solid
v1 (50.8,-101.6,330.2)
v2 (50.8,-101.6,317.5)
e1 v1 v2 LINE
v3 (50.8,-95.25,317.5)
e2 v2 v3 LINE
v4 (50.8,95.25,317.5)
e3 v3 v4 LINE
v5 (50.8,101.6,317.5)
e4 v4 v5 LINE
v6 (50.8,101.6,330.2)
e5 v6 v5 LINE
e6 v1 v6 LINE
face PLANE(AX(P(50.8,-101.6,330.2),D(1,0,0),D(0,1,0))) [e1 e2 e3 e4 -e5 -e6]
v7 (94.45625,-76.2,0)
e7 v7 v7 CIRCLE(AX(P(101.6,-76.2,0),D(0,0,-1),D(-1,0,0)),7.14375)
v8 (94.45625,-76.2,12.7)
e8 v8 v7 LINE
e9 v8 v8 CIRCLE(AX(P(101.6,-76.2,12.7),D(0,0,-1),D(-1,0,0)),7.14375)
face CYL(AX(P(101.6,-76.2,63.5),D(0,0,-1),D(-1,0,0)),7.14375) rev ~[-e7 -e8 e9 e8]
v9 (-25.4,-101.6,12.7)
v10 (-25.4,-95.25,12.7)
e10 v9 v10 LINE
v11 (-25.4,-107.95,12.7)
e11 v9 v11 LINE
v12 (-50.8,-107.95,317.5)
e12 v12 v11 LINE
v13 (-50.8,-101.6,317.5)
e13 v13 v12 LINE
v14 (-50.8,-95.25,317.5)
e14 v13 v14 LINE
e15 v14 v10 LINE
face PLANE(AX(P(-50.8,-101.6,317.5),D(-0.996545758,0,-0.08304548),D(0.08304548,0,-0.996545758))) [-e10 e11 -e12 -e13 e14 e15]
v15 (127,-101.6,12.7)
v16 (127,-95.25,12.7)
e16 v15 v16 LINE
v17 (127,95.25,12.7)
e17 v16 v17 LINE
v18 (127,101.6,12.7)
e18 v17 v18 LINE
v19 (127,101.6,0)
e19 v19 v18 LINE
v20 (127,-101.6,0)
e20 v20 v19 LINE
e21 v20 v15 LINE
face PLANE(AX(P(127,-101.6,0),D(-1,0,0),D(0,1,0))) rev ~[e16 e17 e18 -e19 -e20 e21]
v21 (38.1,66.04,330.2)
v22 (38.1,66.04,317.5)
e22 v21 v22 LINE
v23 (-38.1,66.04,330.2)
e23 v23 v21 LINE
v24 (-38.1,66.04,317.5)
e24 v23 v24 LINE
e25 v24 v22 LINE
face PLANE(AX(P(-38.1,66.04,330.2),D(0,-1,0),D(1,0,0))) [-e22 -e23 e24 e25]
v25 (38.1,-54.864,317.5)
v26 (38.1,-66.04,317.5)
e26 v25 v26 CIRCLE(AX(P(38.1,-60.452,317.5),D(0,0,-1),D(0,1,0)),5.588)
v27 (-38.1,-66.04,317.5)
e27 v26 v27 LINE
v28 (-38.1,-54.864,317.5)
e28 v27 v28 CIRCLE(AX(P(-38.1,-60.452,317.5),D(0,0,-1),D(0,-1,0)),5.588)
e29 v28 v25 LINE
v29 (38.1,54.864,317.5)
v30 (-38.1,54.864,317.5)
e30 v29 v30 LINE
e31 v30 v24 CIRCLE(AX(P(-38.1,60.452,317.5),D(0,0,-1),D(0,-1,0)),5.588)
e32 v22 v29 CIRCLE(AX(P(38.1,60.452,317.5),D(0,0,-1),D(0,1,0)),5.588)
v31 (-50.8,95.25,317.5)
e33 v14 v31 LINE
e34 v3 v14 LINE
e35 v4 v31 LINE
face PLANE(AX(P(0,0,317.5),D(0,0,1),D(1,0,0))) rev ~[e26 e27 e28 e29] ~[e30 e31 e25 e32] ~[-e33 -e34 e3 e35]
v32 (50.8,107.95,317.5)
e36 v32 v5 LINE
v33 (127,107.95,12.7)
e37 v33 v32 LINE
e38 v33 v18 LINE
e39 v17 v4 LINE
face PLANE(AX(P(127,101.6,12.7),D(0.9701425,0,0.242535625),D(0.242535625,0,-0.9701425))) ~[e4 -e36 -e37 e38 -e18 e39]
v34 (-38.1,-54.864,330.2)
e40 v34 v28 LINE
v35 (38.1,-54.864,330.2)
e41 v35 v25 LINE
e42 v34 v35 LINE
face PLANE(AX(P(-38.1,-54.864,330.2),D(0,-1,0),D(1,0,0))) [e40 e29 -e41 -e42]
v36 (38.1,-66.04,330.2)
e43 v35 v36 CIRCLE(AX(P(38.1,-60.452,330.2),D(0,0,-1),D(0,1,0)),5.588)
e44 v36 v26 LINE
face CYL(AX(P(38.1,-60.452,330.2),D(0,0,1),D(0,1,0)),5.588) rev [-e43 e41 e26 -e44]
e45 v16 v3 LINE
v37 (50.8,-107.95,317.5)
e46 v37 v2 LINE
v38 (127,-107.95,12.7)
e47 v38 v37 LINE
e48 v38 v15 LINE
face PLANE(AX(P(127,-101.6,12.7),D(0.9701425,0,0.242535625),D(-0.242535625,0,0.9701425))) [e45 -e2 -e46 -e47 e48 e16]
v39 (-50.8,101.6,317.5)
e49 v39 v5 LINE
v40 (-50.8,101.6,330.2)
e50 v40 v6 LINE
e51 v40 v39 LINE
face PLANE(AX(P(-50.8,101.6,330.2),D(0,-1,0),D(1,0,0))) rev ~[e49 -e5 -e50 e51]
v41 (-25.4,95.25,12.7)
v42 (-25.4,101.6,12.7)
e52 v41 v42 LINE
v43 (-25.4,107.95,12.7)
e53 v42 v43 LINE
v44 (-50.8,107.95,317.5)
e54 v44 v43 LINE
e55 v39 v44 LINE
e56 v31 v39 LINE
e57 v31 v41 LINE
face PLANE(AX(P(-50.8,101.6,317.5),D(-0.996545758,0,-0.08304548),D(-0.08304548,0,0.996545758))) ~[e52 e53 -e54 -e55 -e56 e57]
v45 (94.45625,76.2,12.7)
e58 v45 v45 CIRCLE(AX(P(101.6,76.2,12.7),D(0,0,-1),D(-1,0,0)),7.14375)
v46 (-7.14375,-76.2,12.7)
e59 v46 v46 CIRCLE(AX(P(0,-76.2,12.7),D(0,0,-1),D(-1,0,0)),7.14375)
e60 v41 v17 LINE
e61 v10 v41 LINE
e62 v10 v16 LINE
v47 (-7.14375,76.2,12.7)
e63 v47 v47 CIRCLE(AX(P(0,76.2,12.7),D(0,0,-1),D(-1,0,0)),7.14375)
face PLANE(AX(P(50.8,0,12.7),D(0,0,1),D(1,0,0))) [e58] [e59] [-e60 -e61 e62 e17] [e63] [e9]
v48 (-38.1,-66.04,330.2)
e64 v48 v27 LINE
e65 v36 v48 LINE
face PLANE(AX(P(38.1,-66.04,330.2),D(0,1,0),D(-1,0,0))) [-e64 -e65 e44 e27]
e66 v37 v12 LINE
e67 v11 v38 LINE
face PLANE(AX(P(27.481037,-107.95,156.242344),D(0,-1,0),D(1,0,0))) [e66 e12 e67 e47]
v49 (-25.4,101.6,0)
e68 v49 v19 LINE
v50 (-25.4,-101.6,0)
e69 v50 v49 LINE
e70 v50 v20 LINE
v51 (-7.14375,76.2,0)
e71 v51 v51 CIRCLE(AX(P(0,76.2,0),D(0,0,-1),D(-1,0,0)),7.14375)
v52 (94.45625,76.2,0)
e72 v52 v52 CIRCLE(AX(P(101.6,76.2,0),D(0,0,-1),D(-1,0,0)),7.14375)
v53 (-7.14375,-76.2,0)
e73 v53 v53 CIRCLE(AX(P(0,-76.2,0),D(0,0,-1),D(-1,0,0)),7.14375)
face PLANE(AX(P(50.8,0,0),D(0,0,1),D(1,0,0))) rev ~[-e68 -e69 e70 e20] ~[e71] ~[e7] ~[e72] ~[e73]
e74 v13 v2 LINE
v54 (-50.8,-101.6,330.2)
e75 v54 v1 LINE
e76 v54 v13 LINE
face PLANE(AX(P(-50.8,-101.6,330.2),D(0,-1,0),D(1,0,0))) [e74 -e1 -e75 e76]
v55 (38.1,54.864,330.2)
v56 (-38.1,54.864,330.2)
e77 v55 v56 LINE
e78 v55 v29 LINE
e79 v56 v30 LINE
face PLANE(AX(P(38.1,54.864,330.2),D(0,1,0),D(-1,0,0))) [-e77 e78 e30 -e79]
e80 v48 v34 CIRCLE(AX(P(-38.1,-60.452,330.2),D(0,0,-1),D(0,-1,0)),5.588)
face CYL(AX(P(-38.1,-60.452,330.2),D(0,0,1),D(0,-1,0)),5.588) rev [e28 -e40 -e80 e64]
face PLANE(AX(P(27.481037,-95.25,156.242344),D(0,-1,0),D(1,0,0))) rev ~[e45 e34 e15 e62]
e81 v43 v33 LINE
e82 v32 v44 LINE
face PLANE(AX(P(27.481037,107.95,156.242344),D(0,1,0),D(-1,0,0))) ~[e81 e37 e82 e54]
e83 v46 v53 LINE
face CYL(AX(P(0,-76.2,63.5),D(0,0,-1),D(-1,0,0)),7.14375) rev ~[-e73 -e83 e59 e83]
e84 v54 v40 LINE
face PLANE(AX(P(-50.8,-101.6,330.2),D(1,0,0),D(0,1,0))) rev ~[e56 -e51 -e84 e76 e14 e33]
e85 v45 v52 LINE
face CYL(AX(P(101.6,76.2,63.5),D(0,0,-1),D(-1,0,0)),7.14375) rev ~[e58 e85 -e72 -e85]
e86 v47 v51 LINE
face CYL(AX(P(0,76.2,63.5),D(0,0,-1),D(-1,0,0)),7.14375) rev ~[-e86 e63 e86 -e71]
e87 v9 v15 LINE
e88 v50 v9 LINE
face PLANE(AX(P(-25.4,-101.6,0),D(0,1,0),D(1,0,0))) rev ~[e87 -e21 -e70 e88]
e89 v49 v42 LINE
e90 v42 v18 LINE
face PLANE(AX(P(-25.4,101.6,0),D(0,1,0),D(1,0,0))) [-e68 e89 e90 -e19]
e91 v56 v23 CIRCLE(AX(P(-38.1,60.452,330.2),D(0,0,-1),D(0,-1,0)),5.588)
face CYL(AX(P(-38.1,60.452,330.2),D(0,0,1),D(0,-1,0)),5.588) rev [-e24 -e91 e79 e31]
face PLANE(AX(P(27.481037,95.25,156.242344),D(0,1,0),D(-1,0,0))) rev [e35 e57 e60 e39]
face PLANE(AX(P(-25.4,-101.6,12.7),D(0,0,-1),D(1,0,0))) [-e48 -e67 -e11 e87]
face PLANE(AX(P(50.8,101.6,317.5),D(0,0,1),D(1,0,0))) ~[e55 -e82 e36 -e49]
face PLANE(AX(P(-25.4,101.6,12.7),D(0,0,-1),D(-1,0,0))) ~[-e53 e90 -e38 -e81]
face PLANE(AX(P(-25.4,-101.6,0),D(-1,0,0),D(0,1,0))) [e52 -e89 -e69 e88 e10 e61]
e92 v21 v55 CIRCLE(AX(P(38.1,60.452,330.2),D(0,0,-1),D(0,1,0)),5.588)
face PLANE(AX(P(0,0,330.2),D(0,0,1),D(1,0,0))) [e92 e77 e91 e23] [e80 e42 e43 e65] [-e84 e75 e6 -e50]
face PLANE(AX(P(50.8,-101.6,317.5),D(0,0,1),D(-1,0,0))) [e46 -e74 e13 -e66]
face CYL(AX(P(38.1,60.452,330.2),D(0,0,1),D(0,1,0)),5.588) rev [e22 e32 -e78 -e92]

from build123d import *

# Parameters (mm, degrees)
F1_W     = 101.6
F1_H     = 203.2
F2_DEPTH = 12.7
F3_W     = 152.4
F3_H     = 203.2
F4_DEPTH = 12.7
F6_D     = 14.2875
F6_DEPTH = 50.8
F6_TIP   = 4.2923980472
F8_DEPTH = 6.35


# Not quite as in the source:
# - a length typed as a fraction of an inch, garbled in the dataset ("3 / 203.2 mm" for 3/8 in), is restored


with BuildPart() as f2:
    # F1 (on offset) → F2 (new body)
    with BuildSketch(Plane.XY.offset(330.2)):
        Rectangle(F1_W, F1_H)
        with BuildLine():
            ThreePointArc((-38.1, -66.04), (-43.688, -60.452), (-38.1, -54.864))
            Line((-38.1, -54.864), (38.1, -54.864))
            ThreePointArc((38.1, -54.864), (43.688, -60.452), (38.1, -66.04))
            Line((38.1, -66.04), (-38.1, -66.04))
        make_face(mode=Mode.SUBTRACT)
        with BuildLine():
            Line((38.1, 54.864), (-38.1, 54.864))
            ThreePointArc((-38.1, 54.864), (-43.688, 60.452), (-38.1, 66.04))
            Line((-38.1, 66.04), (38.1, 66.04))
            ThreePointArc((38.1, 66.04), (43.688, 60.452), (38.1, 54.864))
        make_face(mode=Mode.SUBTRACT)
    extrude(amount=-F2_DEPTH)



with BuildPart() as f4:
    # F3 (on Top) → F4 (new body)
    with BuildSketch(Plane.XY):
        with Locations((50.8, 0)):
            Rectangle(F3_W, F3_H)
    extrude(amount=F4_DEPTH)

    # F6
    with Locations(Plane.XY.offset(12.7)):
        with Locations((0, 76.2), (101.6, 76.2), (0, -76.2), (101.6, -76.2)):
            Hole(F6_D / 2, depth=F6_DEPTH)
            with Locations((0, 0, -(F6_DEPTH + F6_TIP / 2))):  # 118° drill point
                Cone(0, F6_D / 2, F6_TIP, mode=Mode.SUBTRACT)


with BuildPart() as f2_1:
    add(f2.part)

    add(f4.part)  # F8 merges F4
    # F7 (on face) → F8 (join, symmetric)
    with BuildSketch(Plane.XZ.offset(101.6)):
        Polygon((50.8, 317.5), (-50.8, 317.5), (-25.4, 12.7), (127, 12.7), align=None)
    extrude(amount=F8_DEPTH, both=True)

    # F9: F2 across plane


with BuildPart() as f2_2:
    add(f2_1.part)
    add(f2_1.part.mirror(Plane.XZ))


solid = f2_2.part
